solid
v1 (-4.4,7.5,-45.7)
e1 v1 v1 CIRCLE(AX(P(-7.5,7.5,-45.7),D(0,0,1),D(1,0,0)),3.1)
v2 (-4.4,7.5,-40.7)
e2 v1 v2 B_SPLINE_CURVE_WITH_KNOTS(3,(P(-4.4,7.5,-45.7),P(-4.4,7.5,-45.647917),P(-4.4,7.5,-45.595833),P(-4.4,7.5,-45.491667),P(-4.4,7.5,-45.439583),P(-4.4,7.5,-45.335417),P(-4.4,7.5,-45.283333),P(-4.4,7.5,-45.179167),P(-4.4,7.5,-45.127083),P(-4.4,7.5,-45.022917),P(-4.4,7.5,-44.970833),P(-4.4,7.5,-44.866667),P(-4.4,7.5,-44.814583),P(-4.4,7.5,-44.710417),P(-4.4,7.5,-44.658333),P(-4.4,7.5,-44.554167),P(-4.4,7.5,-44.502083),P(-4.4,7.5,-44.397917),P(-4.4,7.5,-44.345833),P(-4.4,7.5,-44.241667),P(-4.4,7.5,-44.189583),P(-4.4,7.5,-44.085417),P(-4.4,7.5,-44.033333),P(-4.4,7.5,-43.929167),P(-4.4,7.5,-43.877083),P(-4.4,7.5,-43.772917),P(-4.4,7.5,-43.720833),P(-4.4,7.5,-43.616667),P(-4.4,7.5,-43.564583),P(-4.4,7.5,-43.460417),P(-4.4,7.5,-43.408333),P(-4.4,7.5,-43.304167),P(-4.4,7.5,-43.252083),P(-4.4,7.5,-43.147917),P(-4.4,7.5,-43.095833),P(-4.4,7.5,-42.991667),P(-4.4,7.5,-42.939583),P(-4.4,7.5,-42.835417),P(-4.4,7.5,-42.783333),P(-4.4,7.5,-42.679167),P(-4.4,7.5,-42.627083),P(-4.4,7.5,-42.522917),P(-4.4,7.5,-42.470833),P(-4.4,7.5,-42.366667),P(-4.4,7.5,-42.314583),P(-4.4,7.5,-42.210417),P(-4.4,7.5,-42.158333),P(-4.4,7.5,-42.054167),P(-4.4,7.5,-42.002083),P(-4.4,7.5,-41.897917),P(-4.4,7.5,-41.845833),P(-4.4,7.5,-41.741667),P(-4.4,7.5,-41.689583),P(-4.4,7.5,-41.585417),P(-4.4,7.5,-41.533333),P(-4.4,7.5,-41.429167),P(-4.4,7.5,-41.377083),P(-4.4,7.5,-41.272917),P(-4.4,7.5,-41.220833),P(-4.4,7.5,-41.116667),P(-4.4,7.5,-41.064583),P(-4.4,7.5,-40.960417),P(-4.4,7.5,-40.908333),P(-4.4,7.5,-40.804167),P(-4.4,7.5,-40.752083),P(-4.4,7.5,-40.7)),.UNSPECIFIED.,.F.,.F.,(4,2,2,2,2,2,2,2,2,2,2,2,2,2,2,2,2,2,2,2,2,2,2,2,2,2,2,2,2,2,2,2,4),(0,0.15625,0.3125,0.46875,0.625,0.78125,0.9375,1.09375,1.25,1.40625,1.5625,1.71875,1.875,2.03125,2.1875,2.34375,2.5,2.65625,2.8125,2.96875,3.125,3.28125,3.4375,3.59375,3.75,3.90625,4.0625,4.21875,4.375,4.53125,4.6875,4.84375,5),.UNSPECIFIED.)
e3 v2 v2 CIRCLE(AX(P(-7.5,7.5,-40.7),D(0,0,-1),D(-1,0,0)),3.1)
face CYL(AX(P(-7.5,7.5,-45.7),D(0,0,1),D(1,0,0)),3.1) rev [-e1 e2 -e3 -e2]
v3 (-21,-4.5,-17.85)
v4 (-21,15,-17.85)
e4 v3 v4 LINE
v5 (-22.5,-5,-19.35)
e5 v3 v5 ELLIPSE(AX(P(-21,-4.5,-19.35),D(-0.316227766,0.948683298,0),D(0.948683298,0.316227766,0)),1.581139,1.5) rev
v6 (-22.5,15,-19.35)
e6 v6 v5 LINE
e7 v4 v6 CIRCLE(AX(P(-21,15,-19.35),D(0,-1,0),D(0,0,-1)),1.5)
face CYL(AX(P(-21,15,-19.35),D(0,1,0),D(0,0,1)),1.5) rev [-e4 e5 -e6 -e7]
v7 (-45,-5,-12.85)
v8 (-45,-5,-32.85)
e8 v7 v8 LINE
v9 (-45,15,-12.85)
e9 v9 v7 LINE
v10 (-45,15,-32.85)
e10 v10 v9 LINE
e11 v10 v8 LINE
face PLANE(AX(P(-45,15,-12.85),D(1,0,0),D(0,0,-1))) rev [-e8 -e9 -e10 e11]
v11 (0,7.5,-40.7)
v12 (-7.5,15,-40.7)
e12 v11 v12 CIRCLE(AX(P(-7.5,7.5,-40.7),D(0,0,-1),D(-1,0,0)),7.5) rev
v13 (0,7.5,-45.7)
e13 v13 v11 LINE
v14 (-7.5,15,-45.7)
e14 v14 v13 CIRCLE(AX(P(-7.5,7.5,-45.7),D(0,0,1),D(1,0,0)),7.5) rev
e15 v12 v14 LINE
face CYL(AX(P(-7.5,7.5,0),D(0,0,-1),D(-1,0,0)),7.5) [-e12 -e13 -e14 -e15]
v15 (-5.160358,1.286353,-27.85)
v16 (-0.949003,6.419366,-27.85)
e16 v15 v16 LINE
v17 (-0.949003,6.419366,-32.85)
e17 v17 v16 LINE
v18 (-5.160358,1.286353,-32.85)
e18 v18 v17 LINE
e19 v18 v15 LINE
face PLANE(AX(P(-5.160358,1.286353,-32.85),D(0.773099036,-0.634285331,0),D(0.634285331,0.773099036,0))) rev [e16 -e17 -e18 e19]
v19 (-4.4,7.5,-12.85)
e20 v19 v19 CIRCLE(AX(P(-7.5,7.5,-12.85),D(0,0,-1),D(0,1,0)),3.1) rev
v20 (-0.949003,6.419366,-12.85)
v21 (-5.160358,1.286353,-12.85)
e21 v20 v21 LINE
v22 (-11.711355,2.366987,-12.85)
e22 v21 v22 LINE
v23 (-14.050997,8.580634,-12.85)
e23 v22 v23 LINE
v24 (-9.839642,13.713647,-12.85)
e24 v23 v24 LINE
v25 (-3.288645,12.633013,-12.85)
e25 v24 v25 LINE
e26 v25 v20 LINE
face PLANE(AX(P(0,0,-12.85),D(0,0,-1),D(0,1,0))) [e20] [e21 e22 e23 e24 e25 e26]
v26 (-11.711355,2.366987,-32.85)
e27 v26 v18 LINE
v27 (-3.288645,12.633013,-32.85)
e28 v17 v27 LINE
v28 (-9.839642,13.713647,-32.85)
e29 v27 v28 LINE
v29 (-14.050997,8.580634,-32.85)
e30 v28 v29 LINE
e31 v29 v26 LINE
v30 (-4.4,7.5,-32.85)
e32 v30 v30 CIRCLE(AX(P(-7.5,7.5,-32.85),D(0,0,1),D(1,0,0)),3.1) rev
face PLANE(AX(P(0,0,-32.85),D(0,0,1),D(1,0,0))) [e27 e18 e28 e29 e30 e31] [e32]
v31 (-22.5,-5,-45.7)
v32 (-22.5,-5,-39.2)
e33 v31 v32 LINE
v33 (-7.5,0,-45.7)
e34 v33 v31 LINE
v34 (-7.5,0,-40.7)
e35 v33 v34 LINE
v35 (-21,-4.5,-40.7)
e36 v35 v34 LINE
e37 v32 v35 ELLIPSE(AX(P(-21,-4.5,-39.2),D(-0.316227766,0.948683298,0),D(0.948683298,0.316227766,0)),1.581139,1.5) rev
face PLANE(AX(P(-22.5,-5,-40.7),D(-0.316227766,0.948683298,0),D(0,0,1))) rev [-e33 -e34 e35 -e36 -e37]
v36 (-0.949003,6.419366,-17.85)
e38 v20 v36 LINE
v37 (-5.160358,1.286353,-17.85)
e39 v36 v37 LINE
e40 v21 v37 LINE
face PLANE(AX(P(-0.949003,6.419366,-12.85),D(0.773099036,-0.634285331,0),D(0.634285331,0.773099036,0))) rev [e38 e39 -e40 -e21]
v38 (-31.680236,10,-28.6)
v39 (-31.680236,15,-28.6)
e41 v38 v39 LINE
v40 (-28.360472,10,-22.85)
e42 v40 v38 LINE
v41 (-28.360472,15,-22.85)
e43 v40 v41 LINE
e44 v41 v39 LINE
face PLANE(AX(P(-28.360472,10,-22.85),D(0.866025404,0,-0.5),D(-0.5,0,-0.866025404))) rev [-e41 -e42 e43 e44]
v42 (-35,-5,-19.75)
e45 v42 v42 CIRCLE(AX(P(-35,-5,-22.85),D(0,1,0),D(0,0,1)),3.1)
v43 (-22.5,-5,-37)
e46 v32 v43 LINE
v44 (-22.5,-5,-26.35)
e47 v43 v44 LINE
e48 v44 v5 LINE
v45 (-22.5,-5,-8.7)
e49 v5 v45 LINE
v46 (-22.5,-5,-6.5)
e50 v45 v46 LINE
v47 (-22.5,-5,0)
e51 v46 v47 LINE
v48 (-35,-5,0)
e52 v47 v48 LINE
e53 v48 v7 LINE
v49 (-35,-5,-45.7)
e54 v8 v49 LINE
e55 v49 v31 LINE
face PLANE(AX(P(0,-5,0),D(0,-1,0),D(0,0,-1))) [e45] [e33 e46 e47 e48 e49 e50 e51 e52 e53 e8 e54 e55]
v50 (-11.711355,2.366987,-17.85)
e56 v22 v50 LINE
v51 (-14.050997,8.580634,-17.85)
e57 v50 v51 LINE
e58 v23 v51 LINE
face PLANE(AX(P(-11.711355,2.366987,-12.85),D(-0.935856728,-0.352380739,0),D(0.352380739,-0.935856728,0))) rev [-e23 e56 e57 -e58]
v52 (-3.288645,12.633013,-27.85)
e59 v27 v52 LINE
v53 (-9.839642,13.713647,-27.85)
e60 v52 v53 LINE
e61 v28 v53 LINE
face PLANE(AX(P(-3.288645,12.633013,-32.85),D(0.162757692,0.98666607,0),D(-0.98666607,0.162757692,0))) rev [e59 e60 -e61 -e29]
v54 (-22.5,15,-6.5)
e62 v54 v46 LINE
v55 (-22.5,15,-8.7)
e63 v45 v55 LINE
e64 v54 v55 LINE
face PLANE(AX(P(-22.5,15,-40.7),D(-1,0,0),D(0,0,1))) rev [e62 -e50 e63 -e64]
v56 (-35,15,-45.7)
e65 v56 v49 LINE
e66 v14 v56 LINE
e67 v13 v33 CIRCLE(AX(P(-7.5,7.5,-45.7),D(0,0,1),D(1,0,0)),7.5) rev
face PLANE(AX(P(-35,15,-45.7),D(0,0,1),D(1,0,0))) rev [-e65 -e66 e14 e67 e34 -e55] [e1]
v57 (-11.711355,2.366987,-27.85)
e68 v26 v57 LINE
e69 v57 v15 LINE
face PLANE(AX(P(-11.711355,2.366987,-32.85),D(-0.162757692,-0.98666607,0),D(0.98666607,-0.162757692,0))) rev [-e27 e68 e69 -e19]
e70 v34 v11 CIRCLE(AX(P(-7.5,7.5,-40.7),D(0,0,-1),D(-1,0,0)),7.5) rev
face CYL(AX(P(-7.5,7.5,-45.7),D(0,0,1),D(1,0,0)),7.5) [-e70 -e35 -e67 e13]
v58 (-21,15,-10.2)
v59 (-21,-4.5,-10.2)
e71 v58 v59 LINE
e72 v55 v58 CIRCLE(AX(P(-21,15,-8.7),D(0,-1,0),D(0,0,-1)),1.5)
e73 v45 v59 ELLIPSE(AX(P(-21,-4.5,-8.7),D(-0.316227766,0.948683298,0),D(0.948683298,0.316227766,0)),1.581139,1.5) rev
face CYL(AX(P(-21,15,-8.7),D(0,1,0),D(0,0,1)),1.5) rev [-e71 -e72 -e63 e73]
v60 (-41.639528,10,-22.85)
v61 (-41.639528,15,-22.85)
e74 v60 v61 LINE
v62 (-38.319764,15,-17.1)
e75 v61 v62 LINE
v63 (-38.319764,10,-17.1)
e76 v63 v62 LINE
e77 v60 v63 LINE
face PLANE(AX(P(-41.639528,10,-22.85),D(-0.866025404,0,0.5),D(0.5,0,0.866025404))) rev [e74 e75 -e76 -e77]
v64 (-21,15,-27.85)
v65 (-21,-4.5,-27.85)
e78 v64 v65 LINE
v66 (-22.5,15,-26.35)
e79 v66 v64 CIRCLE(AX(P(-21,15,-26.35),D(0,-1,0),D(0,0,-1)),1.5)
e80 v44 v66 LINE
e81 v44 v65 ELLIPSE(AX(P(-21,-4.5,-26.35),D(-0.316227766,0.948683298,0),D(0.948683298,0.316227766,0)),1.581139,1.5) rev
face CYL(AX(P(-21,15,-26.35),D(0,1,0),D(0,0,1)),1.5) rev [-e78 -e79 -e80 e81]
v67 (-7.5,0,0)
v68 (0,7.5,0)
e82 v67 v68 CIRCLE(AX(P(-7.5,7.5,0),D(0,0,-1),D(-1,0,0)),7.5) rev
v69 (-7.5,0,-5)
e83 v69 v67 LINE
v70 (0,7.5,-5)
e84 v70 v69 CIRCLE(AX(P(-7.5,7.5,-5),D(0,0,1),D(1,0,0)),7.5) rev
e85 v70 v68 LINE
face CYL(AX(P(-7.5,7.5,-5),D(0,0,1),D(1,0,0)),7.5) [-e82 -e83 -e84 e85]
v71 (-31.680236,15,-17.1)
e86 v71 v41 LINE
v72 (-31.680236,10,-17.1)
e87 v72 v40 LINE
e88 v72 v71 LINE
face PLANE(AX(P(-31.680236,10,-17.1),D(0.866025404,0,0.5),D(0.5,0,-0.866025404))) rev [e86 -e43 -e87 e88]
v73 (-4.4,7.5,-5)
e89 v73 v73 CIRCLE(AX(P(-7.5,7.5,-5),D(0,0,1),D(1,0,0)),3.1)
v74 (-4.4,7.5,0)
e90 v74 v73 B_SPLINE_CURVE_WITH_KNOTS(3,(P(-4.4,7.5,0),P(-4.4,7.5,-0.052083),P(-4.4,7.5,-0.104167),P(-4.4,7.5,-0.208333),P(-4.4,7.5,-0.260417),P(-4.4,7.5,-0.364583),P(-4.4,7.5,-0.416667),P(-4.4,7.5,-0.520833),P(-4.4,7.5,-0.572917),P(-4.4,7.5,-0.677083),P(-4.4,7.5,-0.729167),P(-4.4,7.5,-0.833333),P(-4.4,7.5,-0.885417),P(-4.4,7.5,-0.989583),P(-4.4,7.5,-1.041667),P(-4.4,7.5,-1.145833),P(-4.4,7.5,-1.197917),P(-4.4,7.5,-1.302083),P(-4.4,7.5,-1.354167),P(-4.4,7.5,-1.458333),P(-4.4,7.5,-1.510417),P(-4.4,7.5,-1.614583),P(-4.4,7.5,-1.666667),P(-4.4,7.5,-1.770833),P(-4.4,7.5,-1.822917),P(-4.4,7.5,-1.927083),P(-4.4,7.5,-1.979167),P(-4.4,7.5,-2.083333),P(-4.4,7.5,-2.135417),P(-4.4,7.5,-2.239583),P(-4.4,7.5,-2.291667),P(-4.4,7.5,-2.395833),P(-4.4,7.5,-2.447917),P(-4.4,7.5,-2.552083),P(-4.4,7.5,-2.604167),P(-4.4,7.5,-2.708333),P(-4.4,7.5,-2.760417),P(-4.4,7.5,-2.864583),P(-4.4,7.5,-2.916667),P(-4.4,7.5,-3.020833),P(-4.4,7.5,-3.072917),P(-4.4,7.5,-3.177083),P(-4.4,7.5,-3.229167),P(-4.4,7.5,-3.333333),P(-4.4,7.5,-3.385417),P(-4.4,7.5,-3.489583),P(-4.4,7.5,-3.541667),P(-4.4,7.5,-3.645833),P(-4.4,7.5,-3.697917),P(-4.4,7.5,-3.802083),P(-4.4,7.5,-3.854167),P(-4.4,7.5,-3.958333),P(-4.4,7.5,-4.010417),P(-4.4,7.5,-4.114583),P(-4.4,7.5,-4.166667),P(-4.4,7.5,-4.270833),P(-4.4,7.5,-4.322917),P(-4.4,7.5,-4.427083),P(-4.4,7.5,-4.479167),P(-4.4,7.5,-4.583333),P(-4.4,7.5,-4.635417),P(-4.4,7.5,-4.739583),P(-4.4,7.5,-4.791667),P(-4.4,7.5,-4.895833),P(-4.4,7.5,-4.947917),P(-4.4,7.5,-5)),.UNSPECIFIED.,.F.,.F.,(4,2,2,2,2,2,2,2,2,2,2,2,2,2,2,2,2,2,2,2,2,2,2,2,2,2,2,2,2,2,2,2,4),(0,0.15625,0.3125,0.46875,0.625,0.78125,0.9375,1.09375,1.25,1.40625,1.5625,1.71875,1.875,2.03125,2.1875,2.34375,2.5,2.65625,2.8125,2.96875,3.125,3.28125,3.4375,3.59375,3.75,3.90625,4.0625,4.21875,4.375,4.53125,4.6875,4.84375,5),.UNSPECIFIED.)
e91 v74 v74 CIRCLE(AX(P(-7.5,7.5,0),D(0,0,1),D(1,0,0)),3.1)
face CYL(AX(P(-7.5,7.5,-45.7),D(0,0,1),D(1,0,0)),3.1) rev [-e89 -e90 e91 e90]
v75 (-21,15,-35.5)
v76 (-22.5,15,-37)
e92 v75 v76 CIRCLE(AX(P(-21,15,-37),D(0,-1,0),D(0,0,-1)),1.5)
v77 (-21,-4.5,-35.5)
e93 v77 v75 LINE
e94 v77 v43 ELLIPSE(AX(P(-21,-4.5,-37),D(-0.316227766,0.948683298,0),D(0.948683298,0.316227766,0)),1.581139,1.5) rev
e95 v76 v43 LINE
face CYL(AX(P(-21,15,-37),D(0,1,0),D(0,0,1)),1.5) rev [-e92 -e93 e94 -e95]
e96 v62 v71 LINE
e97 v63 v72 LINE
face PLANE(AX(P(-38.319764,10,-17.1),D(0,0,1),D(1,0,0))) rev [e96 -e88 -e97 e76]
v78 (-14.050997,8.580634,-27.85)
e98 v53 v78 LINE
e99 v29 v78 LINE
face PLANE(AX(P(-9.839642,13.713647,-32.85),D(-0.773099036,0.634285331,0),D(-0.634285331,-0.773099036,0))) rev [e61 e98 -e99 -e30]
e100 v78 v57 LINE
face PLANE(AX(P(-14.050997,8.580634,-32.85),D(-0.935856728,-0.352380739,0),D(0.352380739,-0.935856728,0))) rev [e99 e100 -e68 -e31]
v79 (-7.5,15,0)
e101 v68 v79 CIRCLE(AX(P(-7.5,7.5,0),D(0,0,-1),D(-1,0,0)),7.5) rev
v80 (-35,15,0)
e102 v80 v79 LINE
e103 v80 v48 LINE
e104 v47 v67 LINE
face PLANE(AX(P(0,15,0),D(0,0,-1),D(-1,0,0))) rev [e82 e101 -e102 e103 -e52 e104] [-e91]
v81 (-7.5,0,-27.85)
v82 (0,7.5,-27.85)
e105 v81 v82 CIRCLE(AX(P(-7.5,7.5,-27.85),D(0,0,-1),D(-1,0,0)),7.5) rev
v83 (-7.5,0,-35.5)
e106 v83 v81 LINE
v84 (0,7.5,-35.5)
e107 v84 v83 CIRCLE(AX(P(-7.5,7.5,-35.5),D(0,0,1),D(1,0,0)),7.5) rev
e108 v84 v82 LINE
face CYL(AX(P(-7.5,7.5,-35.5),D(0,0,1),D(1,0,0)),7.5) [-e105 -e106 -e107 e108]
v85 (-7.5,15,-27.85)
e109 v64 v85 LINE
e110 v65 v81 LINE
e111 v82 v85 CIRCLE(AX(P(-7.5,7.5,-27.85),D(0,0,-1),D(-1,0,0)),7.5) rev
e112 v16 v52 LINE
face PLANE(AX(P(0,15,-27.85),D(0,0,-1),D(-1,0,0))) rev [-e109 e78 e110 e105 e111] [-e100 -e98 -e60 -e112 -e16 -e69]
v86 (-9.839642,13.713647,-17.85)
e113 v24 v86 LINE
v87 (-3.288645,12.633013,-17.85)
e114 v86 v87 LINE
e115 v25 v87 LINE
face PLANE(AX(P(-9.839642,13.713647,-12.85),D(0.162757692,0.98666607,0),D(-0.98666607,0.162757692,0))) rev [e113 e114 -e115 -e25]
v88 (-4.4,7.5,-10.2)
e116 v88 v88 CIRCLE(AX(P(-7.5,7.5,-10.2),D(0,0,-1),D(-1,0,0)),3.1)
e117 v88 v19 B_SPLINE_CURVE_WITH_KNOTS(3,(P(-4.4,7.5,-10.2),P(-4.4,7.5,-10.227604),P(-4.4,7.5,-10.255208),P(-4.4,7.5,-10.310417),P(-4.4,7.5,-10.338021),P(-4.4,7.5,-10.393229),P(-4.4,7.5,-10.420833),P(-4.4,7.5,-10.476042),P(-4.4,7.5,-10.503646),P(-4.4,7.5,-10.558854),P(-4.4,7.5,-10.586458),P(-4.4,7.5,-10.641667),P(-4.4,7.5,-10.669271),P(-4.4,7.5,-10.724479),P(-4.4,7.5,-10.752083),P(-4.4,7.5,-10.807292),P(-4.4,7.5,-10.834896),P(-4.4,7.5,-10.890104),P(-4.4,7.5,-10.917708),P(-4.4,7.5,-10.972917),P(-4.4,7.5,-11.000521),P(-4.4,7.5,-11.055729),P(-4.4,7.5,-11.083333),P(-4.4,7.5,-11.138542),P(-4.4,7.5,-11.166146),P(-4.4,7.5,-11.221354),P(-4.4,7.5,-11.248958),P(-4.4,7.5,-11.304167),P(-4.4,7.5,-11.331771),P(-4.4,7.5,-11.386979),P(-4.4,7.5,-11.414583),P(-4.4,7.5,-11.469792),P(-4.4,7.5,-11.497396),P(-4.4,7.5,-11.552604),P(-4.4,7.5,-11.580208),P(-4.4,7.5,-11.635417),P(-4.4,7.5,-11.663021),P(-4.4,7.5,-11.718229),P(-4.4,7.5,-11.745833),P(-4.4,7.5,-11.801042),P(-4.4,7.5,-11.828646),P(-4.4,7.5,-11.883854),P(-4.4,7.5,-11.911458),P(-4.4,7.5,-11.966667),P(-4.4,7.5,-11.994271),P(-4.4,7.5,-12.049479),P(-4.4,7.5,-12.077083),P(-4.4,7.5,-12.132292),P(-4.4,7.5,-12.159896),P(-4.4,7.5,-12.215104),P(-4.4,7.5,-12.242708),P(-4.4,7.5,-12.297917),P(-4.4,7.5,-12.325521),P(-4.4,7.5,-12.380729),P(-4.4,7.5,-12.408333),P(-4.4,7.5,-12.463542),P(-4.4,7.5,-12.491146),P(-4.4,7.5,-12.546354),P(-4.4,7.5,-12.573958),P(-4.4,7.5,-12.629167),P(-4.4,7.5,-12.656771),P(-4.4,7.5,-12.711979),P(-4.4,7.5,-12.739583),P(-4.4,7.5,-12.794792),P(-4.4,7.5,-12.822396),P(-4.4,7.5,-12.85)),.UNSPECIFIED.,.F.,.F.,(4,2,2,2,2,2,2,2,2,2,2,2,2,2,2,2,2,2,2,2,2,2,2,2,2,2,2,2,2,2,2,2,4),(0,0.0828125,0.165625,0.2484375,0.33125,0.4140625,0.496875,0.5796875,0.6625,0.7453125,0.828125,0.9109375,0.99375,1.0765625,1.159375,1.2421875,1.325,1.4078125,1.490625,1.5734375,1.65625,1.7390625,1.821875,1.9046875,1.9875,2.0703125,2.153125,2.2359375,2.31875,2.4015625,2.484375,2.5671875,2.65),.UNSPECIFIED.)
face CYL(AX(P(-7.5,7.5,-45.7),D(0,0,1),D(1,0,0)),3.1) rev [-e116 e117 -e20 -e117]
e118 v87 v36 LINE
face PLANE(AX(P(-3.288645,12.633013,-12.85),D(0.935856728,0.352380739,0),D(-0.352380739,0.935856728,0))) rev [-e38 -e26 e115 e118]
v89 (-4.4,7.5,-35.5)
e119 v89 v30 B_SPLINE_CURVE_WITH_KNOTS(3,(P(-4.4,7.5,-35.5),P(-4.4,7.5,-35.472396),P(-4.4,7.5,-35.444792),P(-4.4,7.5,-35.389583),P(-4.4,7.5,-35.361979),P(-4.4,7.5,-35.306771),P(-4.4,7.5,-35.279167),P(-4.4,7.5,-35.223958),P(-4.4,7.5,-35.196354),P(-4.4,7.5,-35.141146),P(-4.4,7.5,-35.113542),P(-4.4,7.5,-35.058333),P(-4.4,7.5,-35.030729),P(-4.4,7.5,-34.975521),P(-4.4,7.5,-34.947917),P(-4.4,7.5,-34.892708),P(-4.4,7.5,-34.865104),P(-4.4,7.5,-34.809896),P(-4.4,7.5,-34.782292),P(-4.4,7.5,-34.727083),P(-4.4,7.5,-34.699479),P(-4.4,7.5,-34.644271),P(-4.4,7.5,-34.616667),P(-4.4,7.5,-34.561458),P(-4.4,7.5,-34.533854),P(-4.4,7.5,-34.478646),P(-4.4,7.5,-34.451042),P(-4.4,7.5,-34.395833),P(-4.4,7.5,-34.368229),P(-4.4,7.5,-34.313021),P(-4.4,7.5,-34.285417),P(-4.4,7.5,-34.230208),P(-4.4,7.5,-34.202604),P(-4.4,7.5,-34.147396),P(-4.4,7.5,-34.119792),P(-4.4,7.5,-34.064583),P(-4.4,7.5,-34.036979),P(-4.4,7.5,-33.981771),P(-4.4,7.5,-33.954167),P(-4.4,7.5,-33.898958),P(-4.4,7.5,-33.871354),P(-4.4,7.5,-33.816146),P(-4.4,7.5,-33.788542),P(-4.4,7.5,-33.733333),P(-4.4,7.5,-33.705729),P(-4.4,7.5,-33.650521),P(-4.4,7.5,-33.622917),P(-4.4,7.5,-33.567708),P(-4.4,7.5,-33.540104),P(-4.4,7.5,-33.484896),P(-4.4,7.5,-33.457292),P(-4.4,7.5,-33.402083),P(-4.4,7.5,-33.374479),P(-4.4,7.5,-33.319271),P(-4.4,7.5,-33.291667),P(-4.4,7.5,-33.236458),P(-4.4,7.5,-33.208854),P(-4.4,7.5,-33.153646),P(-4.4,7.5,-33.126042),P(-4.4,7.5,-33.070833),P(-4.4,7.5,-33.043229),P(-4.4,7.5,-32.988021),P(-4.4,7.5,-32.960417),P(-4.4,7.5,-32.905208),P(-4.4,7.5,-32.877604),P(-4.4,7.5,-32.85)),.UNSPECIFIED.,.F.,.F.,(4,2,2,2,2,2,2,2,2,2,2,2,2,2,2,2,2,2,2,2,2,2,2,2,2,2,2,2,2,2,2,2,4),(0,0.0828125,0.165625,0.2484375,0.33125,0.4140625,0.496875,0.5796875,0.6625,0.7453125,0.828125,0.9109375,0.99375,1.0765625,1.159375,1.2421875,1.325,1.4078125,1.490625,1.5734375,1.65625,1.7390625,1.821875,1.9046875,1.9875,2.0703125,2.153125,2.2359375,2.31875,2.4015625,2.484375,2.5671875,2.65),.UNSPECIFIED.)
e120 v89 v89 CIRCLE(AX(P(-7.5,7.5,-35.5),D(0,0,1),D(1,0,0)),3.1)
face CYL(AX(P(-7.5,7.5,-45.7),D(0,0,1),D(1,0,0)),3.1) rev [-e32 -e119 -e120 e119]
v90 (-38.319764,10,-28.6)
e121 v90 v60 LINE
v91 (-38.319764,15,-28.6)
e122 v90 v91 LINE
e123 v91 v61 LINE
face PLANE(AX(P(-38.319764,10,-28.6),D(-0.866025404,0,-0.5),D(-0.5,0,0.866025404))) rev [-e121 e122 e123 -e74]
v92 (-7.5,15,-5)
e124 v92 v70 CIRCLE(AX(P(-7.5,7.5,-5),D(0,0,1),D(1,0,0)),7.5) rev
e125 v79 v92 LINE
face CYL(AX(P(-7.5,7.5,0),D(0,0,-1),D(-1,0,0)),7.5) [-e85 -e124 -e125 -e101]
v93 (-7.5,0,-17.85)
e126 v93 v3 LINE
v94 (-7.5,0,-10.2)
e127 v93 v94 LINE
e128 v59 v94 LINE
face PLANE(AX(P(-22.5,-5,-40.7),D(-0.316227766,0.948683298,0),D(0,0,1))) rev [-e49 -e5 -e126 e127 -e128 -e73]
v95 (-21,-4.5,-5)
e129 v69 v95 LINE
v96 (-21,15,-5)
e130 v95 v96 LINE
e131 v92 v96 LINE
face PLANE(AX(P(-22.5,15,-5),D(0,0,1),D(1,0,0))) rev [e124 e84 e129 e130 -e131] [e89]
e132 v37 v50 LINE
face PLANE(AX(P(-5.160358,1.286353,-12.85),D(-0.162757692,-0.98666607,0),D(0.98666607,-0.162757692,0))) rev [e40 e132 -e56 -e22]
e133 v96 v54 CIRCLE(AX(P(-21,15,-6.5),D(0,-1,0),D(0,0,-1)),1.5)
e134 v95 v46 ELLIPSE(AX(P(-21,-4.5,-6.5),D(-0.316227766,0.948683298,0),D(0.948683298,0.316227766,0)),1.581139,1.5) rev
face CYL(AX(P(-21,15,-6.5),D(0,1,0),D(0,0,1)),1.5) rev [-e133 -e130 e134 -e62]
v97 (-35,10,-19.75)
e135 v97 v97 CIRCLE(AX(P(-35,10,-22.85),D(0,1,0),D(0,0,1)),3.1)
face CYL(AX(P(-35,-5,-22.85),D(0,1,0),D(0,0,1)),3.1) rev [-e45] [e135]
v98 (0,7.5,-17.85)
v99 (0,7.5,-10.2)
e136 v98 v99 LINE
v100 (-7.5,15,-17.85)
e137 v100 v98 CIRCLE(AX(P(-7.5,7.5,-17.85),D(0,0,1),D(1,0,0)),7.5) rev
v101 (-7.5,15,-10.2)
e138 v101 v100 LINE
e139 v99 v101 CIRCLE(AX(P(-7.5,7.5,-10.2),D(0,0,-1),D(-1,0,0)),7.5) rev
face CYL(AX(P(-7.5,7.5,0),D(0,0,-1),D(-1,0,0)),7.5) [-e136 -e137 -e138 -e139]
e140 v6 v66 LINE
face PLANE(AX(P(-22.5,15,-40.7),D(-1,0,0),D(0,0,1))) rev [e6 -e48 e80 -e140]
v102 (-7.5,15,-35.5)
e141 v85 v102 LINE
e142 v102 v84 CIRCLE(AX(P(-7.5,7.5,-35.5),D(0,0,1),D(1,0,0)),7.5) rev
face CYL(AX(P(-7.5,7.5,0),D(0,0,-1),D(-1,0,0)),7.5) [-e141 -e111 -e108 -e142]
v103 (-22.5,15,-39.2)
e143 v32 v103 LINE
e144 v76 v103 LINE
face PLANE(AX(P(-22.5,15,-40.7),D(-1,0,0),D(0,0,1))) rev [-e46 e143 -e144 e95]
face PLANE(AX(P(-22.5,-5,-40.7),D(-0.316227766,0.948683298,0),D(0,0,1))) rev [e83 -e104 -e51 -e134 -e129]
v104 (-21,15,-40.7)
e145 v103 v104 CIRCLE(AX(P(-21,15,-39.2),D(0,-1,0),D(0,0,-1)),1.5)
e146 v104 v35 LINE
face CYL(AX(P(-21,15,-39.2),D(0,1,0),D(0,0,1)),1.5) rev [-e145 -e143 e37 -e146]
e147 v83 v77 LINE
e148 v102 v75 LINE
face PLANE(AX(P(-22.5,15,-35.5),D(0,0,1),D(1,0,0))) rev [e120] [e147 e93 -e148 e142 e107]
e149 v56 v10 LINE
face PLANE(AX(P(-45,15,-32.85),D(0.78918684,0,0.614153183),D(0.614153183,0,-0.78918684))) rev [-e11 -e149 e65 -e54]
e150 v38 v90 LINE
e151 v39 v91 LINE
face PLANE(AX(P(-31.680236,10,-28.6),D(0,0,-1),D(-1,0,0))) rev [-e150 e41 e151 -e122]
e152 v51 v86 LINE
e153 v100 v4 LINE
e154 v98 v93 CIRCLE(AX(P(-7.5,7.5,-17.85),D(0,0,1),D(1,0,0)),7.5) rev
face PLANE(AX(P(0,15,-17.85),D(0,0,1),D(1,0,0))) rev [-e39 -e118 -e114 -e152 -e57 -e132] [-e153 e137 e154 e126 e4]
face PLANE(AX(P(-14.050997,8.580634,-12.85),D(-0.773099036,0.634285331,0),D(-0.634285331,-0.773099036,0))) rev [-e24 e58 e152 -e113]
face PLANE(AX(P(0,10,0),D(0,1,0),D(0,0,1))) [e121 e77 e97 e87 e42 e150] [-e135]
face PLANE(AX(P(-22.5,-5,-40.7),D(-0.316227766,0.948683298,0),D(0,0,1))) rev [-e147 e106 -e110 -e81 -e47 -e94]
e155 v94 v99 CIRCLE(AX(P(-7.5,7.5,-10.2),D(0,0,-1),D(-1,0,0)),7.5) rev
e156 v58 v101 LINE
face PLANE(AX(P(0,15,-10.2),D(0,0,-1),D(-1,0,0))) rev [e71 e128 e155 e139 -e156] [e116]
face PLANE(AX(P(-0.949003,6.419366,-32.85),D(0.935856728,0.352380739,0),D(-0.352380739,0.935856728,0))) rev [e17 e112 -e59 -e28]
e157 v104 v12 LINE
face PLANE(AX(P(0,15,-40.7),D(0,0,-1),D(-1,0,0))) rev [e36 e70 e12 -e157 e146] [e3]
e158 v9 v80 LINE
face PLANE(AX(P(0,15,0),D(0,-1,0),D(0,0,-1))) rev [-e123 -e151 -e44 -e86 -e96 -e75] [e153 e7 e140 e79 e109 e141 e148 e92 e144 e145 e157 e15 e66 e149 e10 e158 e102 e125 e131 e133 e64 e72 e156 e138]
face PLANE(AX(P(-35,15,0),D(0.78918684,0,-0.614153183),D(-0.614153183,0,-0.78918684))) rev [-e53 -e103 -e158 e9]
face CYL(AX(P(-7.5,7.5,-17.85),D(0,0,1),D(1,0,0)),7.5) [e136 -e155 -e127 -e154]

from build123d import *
from OCP.BRepFilletAPI import BRepFilletAPI_MakeChamfer

# Parameters (mm, degrees)
BOSS_EXTRUDE1_DEPTH = 15
CUT_EXTRUDE4_DEPTH  = 5
SKETCH7_R           = 3.1
CUT_EXTRUDE6_DEPTH  = 66.86721491
FILLET1_R           = 7.5
CUT_EXTRUDE7_DEPTH  = 5
CUT_EXTRUDE8_DEPTH  = 5
FILLET2_R           = 1.5
BOSS_EXTRUDE2_DEPTH = 5
SKETCH6_R           = 3.1
CUT_EXTRUDE5_DEPTH  = 66.86721491
CHAMFER8_SIZE       = 15
CHAMFER8_SIZE_2     = 5


with BuildPart() as part:
    # Sketch1 → Boss-Extrude1 (new body)
    with BuildSketch(Plane(origin=(0, 0, 0), x_dir=(1, 0, 0), z_dir=(0, 1, 0))):
        Polygon((0, 0), (-35, 0), (-45, 12.85), (-45, 32.85), (-35, 45.7), (0, 45.7), (0, 40.7), (-22.5, 40.7), (-22.5, 35.5), (0, 35.5), (0, 27.85), (-22.5, 27.85), (-22.5, 17.85), (0, 17.85), (0, 10.2), (-22.5, 10.2), (-22.5, 5), (0, 5), align=None)
    extrude(amount=BOSS_EXTRUDE1_DEPTH)

    # Sketch5 → Cut-Extrude4 (cut)
    with BuildSketch(Plane(origin=(0, 15, 0), x_dir=(1, 0, 0), z_dir=(0, 1, 0))):
        Polygon((-41.639528096, 22.85), (-38.319764048, 17.1), (-31.680235952, 17.1), (-28.360471904, 22.85), (-31.680235952, 28.6), (-38.319764048, 28.6), align=None)
    extrude(amount=-CUT_EXTRUDE4_DEPTH, mode=Mode.SUBTRACT)

    # Sketch7 → Cut-Extrude6 (cut, through all)
    with BuildSketch(Plane.XY):
        with Locations((-7.5, 7.5)):
            Circle(SKETCH7_R)
    extrude(amount=-CUT_EXTRUDE6_DEPTH, mode=Mode.SUBTRACT)

    # Fillet1
    fillet1_edges = [part.edges().sort_by_distance(p)[0] for p in [
        (0, 0, -43.2),
        (0, 0, -31.675),
        (0, 0, -2.5),
        (0, 15, -43.2),
        (0, 15, -31.675),
        (0, 15, -2.5),
        (0, 0, -14.025),
        (0, 15, -14.025),
    ]]
    fillet(fillet1_edges, radius=FILLET1_R - 0.0001)  # a hair under: the kernel refuses the full size

    # Sketch8 → Cut-Extrude7 (cut)
    with BuildSketch(Plane.XY.offset(-27.85)):
        Polygon((-9.839641819, 13.713647036), (-14.050997093, 8.580634267), (-11.711355274, 2.366987231), (-5.160358181, 1.286352964), (-0.949002907, 6.419365733), (-3.288644726, 12.633012769), align=None)
    extrude(amount=-CUT_EXTRUDE7_DEPTH, mode=Mode.SUBTRACT)

    # Sketch9 → Cut-Extrude8 (cut)
    with BuildSketch(Plane(origin=(0, 0, -17.85), x_dir=(-1, 0, 0), z_dir=(0, 0, -1))):
        Polygon((9.839641819, 13.713647036), (3.288644726, 12.633012769), (0.949002907, 6.419365733), (5.160358181, 1.286352964), (11.711355274, 2.366987231), (14.050997093, 8.580634267), align=None)
    extrude(amount=-CUT_EXTRUDE8_DEPTH, mode=Mode.SUBTRACT)

    # Fillet2
    fillet2_edges = [part.edges().sort_by_distance(p)[0] for p in [
        (-22.5, 7.5, -40.7),
        (-22.5, 7.5, -35.5),
        (-22.5, 7.5, -27.85),
        (-22.5, 7.5, -17.85),
        (-22.5, 7.5, -10.2),
        (-22.5, 7.5, -5),
    ]]
    fillet(fillet2_edges, radius=FILLET2_R)

    # Sketch15 → Boss-Extrude2 (add)
    with BuildSketch(Plane.XZ):
        Polygon((-35, 0), (-45, -12.85), (-45, -32.85), (-35, -45.7), (-22.5, -45.7), (-22.5, 0), align=None)
    extrude(amount=BOSS_EXTRUDE2_DEPTH)

    # Sketch6 → Cut-Extrude5 (cut, through all)
    with BuildSketch(Plane(origin=(0, 10, 0), x_dir=(1, 0, 0), z_dir=(0, 1, 0))):
        with Locations(Location((-35, 22.85, 0), (0, 0, 270))):
            Circle(SKETCH6_R)
    extrude(amount=-CUT_EXTRUDE5_DEPTH, mode=Mode.SUBTRACT)

    # Chamfer8
    chamfer8_edges_1 = [part.edges().sort_by_distance(p)[0] for p in [
        (-22.5, 0, -3.25),
    ]]
    chamfer8_side_1 = [part.faces().sort_by_distance(p)[0] for p in [
        (-22.4, 0, -3.25),
    ]]
    chamfer8_edges_2 = [part.edges().sort_by_distance(p)[0] for p in [
        (-22.5, 0, -42.45),
    ]]
    chamfer8_side_2 = [part.faces().sort_by_distance(p)[0] for p in [
        (-22.5, -0.1, -42.45),
    ]]
    chamfer8_edges_3 = [part.edges().sort_by_distance(p)[0] for p in [
        (-22.5, 0, -14.025),
    ]]
    chamfer8_side_3 = [part.faces().sort_by_distance(p)[0] for p in [
        (-22.5, -0.1, -14.025),
    ]]
    chamfer8_edges_4 = [part.edges().sort_by_distance(p)[0] for p in [
        (-22.5, 0, -31.675),
    ]]
    chamfer8_side_4 = [part.faces().sort_by_distance(p)[0] for p in [
        (-22.5, -0.1, -31.675),
    ]]
    chamfer8 = BRepFilletAPI_MakeChamfer(part.part.solid().wrapped)
    for e in chamfer8_edges_1:
        chamfer8.Add(CHAMFER8_SIZE - 0.0001, CHAMFER8_SIZE_2 - 0.0001, e.wrapped, chamfer8_side_1[0].wrapped)
    for e in chamfer8_edges_2:
        chamfer8.Add(CHAMFER8_SIZE_2 - 0.0001, CHAMFER8_SIZE - 0.0001, e.wrapped, chamfer8_side_2[0].wrapped)
    for e in chamfer8_edges_3:
        chamfer8.Add(CHAMFER8_SIZE_2 - 0.0001, CHAMFER8_SIZE - 0.0001, e.wrapped, chamfer8_side_3[0].wrapped)
    for e in chamfer8_edges_4:
        chamfer8.Add(CHAMFER8_SIZE_2 - 0.0001, CHAMFER8_SIZE - 0.0001, e.wrapped, chamfer8_side_4[0].wrapped)
    add(Compound.cast(chamfer8.Shape()), mode=Mode.REPLACE)  # a hair under: the kernel refuses the full size


solid = part.part
